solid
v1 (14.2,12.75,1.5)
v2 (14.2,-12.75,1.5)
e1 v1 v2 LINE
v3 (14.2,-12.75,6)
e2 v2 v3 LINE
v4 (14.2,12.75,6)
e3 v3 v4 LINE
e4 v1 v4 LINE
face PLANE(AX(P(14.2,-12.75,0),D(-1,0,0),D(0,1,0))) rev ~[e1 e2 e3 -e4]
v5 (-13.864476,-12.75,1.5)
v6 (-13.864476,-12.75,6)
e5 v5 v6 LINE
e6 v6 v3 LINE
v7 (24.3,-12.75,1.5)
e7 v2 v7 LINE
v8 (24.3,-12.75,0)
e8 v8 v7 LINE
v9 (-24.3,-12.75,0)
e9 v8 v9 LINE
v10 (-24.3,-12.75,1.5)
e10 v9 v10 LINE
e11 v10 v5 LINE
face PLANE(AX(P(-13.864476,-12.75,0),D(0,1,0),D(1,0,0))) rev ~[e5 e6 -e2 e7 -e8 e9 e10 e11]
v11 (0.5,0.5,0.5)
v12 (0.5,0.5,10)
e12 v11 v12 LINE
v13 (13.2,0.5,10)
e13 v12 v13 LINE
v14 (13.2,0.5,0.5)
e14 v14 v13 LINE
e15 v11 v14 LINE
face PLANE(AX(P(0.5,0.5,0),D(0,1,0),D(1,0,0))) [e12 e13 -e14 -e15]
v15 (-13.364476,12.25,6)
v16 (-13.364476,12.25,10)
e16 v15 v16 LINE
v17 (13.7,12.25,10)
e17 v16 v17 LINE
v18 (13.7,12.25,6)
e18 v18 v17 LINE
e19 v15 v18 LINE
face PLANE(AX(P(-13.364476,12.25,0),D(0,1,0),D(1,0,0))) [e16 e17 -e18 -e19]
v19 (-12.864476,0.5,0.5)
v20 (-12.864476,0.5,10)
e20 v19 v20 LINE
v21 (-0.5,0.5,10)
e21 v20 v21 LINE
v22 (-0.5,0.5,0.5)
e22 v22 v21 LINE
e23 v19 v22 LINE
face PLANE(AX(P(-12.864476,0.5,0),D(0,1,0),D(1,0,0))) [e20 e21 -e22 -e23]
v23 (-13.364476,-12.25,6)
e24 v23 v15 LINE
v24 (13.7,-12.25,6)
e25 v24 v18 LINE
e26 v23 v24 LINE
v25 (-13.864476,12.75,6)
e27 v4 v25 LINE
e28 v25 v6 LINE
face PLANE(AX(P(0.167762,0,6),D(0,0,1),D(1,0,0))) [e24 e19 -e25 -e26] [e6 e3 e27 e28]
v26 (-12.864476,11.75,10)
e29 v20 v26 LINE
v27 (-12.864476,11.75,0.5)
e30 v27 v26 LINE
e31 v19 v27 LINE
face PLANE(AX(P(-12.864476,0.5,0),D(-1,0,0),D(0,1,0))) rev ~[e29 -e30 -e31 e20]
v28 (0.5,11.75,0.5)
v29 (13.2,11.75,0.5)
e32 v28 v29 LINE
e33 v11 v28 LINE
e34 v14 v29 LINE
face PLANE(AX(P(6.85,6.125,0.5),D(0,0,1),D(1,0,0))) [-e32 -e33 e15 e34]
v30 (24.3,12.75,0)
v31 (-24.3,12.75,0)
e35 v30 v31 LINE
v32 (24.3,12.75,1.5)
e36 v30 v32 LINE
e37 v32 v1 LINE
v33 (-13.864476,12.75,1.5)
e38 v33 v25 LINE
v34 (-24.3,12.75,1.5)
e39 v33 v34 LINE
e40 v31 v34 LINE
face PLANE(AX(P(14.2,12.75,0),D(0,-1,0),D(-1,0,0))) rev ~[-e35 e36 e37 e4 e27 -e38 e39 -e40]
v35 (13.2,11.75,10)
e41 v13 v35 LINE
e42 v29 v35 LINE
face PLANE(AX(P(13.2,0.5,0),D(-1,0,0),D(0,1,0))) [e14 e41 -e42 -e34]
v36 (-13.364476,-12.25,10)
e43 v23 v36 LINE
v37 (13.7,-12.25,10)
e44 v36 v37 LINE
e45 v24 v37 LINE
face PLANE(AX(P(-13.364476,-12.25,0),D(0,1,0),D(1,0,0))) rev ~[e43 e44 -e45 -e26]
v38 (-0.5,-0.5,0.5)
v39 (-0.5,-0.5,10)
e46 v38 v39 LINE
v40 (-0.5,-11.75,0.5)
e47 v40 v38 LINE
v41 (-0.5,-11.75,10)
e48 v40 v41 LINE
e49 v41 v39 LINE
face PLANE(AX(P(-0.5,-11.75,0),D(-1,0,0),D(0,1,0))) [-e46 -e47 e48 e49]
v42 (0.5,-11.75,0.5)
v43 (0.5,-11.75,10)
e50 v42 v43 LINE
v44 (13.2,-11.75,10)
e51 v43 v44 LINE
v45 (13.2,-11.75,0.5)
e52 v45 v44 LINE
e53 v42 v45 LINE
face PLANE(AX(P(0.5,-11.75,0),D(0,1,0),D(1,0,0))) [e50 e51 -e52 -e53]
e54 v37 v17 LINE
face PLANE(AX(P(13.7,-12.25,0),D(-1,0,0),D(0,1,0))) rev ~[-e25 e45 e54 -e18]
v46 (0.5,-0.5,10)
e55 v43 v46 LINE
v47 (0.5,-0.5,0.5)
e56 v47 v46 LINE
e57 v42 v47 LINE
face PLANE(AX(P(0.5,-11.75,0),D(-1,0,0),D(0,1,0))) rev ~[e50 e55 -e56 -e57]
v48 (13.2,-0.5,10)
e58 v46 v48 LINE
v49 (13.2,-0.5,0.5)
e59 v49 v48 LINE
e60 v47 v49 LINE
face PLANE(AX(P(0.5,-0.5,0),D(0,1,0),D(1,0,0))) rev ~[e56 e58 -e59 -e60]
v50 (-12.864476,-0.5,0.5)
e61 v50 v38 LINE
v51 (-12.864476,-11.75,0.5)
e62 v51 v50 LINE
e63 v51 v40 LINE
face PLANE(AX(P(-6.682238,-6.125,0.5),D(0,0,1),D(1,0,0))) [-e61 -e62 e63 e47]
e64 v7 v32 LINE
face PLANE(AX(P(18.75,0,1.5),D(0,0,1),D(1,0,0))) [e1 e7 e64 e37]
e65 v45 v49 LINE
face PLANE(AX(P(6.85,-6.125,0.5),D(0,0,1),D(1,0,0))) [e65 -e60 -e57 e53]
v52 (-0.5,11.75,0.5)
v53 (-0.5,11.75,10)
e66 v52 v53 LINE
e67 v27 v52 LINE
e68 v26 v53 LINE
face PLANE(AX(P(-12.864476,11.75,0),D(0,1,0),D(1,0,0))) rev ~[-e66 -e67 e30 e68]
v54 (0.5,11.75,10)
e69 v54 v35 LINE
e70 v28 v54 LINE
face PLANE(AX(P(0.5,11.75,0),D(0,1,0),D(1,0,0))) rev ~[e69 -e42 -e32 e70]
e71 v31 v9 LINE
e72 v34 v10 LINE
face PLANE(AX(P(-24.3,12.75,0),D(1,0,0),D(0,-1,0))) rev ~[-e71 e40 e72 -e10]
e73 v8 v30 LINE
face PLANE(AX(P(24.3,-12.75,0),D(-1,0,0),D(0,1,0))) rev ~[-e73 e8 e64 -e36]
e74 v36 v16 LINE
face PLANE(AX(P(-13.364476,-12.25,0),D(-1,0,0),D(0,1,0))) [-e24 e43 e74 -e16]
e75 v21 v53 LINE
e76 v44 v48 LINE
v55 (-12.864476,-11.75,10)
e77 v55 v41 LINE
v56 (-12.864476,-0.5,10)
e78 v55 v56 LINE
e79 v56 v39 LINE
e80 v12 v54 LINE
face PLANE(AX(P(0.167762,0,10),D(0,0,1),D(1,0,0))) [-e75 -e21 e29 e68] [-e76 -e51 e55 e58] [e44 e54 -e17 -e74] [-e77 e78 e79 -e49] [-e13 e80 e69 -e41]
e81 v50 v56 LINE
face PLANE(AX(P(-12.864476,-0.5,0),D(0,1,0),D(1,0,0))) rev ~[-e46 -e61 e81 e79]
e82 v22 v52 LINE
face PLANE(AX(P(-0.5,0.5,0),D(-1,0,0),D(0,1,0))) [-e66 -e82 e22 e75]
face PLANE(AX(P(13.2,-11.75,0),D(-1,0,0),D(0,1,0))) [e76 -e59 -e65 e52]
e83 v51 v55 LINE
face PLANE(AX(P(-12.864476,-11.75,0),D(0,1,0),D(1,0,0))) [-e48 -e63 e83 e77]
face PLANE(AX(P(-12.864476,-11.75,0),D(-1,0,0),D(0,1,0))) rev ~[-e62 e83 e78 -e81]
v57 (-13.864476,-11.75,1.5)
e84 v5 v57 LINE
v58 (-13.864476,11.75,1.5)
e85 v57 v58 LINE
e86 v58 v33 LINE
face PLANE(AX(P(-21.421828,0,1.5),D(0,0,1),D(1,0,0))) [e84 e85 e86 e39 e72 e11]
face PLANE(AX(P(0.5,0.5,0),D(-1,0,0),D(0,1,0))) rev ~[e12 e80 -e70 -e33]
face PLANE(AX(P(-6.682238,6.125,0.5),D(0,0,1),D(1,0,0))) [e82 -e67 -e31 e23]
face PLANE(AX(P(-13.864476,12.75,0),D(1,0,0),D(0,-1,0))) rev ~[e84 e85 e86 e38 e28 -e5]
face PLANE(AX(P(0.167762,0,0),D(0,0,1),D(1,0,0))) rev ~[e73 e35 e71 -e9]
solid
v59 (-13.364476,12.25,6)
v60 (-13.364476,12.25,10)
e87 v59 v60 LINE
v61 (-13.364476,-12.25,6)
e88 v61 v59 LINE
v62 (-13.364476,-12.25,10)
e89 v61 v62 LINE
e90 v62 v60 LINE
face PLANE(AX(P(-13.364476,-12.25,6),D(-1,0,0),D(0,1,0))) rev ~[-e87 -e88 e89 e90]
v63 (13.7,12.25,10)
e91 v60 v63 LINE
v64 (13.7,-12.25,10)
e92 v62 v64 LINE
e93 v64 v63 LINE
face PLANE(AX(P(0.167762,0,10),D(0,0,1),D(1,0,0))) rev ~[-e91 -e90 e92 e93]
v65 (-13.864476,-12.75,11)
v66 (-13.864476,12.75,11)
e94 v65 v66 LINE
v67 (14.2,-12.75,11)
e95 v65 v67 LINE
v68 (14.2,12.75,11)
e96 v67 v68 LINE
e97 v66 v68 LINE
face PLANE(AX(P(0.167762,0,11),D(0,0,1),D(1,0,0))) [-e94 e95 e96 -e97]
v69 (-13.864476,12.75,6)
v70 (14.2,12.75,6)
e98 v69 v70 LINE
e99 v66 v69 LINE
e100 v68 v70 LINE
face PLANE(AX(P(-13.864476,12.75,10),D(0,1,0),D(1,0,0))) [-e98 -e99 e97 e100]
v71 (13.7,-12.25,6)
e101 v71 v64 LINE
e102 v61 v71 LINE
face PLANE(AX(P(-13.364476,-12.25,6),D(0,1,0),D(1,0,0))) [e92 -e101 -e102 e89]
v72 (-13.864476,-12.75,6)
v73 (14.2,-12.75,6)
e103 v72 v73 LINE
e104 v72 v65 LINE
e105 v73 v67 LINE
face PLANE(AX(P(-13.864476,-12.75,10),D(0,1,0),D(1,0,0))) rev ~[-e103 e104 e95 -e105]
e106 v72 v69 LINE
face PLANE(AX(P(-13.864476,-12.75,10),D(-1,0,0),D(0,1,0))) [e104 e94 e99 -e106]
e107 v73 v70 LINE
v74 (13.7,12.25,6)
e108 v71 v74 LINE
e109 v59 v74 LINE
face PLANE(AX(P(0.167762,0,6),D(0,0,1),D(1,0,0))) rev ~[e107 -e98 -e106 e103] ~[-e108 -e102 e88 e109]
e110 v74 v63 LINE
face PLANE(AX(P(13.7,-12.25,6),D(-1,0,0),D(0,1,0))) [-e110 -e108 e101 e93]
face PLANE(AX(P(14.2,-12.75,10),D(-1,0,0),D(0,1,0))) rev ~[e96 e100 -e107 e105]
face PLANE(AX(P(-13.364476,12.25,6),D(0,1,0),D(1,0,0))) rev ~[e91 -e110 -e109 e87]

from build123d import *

# Parameters (mm, degrees)
F0_W     = 9.1
F0_H     = 23.5
F1_DEPTH = 1.5
F0_W_2   = 9.4355237663
F0_W_3   = 12.3644762337
F0_H_2   = 11.25
F2_DEPTH = 0.5
F0_W_4   = 12.7
F0_W_5   = 27.0644762337
F0_H_3   = 24.5
F3_DEPTH = 6
F4_DEPTH = 10
F5_W     = 28.0644762337
F5_H     = 25.5
F5_W_2   = 27.0644762337
F5_H_2   = 24.5
F6_DEPTH = 4
F7_W     = 28.0644762337
F7_H     = 25.5
F8_DEPTH = 1


# Not quite as in the source:
# - a feature names something its author has since deleted; it is built from what else it names


with BuildPart() as f1:
    # F0 (on Top) → F1 (new body)
    with BuildSketch(Plane.XY):
        with Locations((18.75, 0)):
            Rectangle(F0_W, F0_H)
        Polygon((24.3, -12.75), (24.3, 12.75), (14.2, 12.75), (14.2, 11.75), (23.3, 11.75), (23.3, -11.75), (14.2, -11.75), (14.2, -12.75), align=None)
    extrude(amount=F1_DEPTH)



with BuildPart() as f1b:
    # F0 (on Top) → F1, piece 2 (new body)
    with BuildSketch(Plane.XY):
        Polygon((-13.8644762337, 11.75), (-13.8644762337, 12.75), (-24.3, 12.75), (-24.3, -12.75), (-13.8644762337, -12.75), (-13.8644762337, -11.75), (-23.3, -11.75), (-23.3, 11.75), align=None)
        with Locations((-18.5822381169, 0)):
            Rectangle(F0_W_2, F0_H)
    extrude(amount=F1_DEPTH)


with BuildPart() as f2:
    # F0 (on Top) → F2 (new body)
    with BuildSketch(Plane.XY):
        with Locations((-6.6822381169, 6.125)):
            Rectangle(F0_W_3, F0_H_2)
    extrude(amount=F2_DEPTH)


with BuildPart() as f2b:
    # F0 (on Top) → F2, piece 2 (new body)
    with BuildSketch(Plane.XY):
        with Locations((6.85, 6.125)):
            Rectangle(F0_W_4, F0_H_2)
    extrude(amount=F2_DEPTH)


with BuildPart() as f2c:
    # F0 (on Top) → F2, piece 3 (new body)
    with BuildSketch(Plane.XY):
        with Locations((-6.6822381169, -6.125)):
            Rectangle(F0_W_3, F0_H_2)
    extrude(amount=F2_DEPTH)


with BuildPart() as f2d:
    # F0 (on Top) → F2, piece 4 (new body)
    with BuildSketch(Plane.XY):
        with Locations((6.85, -6.125)):
            Rectangle(F0_W_4, F0_H_2)
    extrude(amount=F2_DEPTH)


with BuildPart() as f1_1:
    add(f1.part)

    add(f1b.part)  # F3 merges F1b
    # F0 (on Top) → F3 (join)
    with BuildSketch(Plane.XY):
        Polygon((14.2, 11.75), (14.2, 12.75), (-13.8644762337, 12.75), (-13.8644762337, 11.75), (-13.8644762337, -11.75), (-13.8644762337, -12.75), (14.2, -12.75), (14.2, -11.75), align=None)
        with Locations((0.1677618831, 0)):
            Rectangle(F0_W_5, F0_H_3, mode=Mode.SUBTRACT)
    extrude(amount=F3_DEPTH)


    add(f2.part)  # F4 merges F2

    add(f2b.part)  # F4 merges F2b

    add(f2c.part)  # F4 merges F2c

    add(f2d.part)  # F4 merges F2d
    # F0 (on Top) → F4 (join)
    with BuildSketch(Plane.XY):
        with Locations((0.1677618831, 0)):
            Rectangle(F0_W_5, F0_H_3)
        with Locations((-6.6822381169, -6.125)):
            Rectangle(F0_W_3, F0_H_2, mode=Mode.SUBTRACT)
        with Locations((6.85, -6.125)):
            Rectangle(F0_W_4, F0_H_2, mode=Mode.SUBTRACT)
        with Locations((-6.6822381169, 6.125)):
            Rectangle(F0_W_3, F0_H_2, mode=Mode.SUBTRACT)
        with Locations((6.85, 6.125)):
            Rectangle(F0_W_4, F0_H_2, mode=Mode.SUBTRACT)
    extrude(amount=F4_DEPTH)


with BuildPart() as f6:
    # F5 (on face) → F6 (new body)
    with BuildSketch(Plane.XY.offset(6)):
        with Locations((0.1677618831, 0)):
            Rectangle(F5_W, F5_H)
        with Locations((0.1677618831, 0)):
            Rectangle(F5_W_2, F5_H_2, mode=Mode.SUBTRACT)
    extrude(amount=F6_DEPTH)

    # F7 (on face) → F8 (join)
    with BuildSketch(Plane.XY.offset(10)):
        with Locations((0.1677618831, 0)):
            Rectangle(F7_W, F7_H)
    extrude(amount=F8_DEPTH)


solid = Compound([f1_1.part, f6.part])
